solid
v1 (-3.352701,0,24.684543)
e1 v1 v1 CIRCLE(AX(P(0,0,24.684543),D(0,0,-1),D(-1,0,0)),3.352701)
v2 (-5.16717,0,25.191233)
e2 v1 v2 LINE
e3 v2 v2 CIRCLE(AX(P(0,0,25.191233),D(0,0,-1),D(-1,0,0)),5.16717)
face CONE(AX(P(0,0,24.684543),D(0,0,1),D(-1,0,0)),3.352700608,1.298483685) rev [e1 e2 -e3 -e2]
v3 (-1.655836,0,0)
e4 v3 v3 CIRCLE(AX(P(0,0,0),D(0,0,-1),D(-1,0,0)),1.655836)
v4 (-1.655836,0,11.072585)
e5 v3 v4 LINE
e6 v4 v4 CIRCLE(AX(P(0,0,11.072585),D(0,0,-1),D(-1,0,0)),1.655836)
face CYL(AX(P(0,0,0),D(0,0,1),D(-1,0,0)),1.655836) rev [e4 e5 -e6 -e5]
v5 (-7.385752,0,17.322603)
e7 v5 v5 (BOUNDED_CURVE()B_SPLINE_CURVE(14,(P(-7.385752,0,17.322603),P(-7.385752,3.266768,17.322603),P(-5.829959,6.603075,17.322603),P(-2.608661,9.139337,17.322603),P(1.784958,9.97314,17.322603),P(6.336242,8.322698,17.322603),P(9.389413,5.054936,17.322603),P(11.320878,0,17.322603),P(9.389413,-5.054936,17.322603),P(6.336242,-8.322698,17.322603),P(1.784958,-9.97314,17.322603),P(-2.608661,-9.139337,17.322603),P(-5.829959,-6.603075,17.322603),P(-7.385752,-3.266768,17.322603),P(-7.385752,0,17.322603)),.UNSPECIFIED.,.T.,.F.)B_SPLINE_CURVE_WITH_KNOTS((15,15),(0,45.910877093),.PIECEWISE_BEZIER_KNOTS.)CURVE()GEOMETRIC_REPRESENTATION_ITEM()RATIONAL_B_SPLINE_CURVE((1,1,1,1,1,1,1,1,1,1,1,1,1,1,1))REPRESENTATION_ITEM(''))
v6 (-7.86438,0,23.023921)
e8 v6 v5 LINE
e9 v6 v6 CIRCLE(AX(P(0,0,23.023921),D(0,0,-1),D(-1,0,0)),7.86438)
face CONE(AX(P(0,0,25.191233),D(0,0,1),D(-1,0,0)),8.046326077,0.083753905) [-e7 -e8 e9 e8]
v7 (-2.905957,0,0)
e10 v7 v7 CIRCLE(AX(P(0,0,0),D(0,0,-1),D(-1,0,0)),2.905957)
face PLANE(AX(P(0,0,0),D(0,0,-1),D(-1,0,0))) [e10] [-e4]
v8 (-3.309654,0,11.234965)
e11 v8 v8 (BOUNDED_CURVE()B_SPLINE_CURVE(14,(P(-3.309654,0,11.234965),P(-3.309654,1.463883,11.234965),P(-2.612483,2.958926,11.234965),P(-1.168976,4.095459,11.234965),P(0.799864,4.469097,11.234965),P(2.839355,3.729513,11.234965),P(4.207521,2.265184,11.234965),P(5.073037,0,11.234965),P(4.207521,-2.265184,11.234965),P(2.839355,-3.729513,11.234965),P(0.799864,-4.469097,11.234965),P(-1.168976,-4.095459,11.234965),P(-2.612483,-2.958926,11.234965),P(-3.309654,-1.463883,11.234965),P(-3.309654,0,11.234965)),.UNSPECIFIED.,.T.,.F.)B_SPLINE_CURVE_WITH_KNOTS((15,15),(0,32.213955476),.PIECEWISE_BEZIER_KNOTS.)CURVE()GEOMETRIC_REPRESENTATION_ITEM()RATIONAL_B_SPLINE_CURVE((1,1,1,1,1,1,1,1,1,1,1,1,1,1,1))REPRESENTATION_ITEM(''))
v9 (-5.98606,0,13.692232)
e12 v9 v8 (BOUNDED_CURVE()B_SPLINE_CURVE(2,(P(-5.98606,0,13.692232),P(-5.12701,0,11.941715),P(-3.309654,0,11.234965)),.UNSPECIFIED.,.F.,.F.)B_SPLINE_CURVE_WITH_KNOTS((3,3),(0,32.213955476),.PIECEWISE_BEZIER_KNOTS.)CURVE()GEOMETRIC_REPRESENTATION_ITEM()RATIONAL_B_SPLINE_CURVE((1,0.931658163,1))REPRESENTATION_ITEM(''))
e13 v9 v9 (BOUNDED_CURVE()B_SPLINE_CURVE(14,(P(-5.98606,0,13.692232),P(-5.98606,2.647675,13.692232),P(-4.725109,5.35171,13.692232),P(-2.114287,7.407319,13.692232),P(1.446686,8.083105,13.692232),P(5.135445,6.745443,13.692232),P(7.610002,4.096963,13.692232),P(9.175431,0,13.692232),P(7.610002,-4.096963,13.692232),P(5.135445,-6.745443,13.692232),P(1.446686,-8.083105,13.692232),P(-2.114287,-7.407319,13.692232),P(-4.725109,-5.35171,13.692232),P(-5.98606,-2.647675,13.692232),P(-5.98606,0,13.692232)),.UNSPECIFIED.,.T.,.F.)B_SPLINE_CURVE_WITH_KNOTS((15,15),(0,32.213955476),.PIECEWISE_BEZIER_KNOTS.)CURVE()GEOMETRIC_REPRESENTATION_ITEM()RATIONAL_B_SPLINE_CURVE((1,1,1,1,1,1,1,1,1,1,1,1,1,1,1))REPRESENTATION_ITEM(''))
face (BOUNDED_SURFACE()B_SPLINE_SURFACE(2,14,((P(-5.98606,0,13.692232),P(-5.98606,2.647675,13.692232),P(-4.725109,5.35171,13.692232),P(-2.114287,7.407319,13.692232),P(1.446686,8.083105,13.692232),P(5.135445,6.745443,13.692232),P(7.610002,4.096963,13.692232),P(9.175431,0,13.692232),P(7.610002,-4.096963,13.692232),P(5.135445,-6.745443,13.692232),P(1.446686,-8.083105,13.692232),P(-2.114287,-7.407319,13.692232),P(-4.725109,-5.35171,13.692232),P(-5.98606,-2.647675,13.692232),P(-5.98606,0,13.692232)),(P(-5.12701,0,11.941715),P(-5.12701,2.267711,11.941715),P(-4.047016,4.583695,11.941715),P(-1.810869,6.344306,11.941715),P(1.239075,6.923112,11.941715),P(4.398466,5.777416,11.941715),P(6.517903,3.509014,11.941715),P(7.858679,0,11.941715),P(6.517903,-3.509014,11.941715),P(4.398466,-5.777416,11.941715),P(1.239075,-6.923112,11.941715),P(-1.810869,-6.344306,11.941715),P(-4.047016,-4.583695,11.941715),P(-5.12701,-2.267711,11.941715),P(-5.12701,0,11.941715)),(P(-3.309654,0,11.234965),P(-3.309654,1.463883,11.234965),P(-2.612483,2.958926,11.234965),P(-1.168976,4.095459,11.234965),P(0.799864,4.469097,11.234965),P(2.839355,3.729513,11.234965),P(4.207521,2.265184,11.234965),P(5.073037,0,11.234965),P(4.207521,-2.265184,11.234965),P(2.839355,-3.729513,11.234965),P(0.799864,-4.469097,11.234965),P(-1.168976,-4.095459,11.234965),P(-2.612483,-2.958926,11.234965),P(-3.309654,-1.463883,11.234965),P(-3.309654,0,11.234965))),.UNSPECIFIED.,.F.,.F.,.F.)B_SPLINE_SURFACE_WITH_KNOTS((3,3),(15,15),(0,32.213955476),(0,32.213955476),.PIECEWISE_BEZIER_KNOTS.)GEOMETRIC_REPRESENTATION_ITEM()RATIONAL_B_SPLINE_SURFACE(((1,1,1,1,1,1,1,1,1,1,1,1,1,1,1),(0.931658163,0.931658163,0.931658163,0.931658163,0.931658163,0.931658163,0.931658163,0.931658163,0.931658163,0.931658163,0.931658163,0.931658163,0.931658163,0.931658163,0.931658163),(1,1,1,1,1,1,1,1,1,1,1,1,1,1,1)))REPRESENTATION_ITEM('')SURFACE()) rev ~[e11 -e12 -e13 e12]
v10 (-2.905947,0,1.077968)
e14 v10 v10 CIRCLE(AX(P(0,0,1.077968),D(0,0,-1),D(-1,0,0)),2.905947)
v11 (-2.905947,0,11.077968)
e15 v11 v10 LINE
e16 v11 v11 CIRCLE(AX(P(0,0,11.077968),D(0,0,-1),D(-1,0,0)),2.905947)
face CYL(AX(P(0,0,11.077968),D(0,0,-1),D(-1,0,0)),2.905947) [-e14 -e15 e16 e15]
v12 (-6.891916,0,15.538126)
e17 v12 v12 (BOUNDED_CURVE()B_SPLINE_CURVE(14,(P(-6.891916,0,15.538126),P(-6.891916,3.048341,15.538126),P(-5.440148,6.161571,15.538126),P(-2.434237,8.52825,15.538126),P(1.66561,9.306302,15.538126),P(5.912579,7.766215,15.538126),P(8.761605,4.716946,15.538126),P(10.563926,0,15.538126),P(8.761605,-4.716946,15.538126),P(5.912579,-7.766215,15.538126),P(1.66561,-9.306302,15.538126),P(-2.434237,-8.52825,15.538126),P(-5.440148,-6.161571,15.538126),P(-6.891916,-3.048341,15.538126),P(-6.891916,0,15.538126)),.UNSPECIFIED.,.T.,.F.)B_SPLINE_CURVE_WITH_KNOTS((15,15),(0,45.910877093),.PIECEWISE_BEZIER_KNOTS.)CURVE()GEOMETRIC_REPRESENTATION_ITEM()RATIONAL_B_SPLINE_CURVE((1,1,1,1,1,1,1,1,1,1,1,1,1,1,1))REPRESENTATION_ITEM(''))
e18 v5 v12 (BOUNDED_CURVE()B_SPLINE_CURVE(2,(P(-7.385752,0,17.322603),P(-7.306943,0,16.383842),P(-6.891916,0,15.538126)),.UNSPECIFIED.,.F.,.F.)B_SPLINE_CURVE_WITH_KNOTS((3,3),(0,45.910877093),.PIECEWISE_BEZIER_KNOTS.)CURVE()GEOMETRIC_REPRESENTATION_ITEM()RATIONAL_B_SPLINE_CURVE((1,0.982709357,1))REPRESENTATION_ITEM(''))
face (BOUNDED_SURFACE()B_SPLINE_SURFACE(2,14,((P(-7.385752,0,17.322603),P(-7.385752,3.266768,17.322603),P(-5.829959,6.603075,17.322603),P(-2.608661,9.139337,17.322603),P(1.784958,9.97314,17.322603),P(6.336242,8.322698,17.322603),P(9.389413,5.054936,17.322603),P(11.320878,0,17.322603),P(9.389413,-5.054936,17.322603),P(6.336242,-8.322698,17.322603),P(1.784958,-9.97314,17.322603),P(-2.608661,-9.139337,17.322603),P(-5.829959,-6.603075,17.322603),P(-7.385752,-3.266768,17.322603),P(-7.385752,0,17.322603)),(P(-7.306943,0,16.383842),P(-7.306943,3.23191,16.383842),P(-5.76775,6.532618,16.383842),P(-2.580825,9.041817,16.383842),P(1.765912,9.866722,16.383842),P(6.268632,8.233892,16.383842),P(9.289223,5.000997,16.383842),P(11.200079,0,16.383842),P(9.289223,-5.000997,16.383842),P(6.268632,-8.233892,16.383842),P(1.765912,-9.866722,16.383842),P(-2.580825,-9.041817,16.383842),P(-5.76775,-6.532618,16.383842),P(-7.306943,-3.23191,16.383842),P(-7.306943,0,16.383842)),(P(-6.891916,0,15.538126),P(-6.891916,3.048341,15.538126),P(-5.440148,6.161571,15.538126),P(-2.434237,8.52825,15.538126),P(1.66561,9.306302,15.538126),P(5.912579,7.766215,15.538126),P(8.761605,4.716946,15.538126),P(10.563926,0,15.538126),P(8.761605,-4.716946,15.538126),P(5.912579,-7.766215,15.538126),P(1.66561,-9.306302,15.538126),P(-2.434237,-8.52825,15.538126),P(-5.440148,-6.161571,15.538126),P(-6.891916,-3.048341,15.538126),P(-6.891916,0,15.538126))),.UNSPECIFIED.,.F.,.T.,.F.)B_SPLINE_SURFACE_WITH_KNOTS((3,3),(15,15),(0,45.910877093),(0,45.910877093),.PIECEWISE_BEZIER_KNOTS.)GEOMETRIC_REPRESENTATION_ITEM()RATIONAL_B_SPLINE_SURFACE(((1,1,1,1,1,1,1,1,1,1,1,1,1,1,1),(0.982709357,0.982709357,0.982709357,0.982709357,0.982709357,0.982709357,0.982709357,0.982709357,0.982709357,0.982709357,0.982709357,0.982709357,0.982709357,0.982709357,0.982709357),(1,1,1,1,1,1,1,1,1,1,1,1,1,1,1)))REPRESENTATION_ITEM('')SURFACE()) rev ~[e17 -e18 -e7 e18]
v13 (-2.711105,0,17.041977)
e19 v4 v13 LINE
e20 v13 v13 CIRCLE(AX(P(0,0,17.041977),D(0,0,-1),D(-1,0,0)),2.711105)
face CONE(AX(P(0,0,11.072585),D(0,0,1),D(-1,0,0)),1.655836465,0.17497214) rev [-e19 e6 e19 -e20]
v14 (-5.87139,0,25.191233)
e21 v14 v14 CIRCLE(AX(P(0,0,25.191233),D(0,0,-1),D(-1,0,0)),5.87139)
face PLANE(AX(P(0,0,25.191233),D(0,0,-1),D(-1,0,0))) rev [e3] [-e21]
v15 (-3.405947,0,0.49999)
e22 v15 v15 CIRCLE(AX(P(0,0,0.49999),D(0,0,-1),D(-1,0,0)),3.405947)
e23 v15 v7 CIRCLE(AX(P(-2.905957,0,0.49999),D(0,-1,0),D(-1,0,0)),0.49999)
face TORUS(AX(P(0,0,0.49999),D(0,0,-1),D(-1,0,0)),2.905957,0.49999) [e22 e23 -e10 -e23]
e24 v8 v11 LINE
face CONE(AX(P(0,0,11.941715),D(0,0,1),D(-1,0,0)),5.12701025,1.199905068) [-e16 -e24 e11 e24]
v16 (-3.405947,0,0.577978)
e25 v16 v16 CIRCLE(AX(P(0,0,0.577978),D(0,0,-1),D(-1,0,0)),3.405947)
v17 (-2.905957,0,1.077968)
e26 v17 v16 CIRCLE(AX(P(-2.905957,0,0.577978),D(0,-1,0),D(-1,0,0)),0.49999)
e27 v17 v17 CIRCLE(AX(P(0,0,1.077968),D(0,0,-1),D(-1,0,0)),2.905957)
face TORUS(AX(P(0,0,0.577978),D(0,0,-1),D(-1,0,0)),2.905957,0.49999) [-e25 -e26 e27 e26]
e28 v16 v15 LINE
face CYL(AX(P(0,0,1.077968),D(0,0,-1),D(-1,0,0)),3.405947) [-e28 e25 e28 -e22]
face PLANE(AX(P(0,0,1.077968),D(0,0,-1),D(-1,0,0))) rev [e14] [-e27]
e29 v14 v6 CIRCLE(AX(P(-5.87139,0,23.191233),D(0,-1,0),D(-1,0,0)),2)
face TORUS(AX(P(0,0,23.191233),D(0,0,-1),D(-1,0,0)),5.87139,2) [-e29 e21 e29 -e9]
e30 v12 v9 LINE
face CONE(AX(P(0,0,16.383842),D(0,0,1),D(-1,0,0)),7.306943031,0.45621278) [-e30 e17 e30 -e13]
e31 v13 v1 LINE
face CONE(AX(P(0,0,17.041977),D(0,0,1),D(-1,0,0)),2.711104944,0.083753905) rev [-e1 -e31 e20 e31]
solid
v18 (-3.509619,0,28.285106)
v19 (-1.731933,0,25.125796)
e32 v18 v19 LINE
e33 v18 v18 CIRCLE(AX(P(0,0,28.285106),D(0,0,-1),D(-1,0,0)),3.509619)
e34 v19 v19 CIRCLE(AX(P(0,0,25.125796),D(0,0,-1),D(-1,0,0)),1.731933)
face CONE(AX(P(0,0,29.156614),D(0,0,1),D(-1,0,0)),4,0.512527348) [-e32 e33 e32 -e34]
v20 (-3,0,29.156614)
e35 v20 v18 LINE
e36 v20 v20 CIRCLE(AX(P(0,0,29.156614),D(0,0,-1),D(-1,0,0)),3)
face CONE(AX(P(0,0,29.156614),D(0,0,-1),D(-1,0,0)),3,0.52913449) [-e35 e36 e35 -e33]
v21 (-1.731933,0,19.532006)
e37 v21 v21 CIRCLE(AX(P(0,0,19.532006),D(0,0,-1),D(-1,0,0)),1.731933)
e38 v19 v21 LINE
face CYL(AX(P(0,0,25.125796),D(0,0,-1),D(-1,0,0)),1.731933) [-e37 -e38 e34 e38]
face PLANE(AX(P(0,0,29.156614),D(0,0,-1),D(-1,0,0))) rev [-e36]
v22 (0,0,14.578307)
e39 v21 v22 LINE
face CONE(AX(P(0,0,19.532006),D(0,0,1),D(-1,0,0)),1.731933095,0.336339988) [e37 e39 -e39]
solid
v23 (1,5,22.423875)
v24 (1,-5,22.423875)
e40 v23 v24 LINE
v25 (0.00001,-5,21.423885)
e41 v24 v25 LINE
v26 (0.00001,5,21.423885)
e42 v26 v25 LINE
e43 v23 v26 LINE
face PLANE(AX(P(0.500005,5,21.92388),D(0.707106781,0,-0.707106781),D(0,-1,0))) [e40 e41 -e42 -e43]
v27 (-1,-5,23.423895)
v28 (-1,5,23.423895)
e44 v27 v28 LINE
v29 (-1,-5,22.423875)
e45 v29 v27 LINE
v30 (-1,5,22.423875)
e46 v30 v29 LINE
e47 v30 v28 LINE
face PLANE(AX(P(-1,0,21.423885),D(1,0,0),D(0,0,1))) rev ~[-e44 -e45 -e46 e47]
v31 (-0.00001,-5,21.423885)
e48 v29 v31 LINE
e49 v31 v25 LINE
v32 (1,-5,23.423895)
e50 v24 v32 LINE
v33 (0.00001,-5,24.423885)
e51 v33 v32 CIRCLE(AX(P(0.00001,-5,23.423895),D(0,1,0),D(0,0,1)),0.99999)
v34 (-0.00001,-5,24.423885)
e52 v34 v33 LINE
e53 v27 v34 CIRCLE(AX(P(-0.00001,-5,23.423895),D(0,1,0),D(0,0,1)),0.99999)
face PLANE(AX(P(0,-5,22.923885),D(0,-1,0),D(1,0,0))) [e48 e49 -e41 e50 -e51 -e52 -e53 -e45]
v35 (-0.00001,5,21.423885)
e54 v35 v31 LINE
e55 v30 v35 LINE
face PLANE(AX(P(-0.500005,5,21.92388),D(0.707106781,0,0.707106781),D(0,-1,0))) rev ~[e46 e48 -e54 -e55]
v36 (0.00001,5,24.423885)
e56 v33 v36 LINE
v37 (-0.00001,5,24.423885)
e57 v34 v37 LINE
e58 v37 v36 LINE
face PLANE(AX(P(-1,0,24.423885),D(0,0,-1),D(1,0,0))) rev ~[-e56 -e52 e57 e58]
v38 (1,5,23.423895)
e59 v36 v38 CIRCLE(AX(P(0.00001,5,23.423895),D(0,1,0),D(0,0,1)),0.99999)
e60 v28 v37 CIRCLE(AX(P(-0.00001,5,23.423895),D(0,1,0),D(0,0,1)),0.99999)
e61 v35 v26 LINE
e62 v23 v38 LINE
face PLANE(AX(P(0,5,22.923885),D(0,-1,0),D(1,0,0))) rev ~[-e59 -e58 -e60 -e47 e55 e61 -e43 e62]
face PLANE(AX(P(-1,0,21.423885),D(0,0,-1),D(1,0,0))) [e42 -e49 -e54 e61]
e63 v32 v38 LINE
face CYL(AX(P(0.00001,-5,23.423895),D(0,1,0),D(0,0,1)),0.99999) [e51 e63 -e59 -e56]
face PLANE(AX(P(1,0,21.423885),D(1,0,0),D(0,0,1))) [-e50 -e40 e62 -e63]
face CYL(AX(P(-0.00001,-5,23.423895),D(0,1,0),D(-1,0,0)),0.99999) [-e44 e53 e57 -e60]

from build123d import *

# Parameters (mm, degrees)
F2_W     = 2
F2_H     = 3
F3_DEPTH = 5
F4_SIZE  = 0.99999
F5_R     = 0.99999
F6_R     = 2
F7_SIZE  = 1
F8_R     = 5
F9_R     = 0.49999


# Not quite as in the source:
# - a fillet or chamfer is up to 0.001 mm smaller than in the source, because OpenCascade refuses the exact size


with BuildPart() as f1:
    # F0 (on Front) → F1 (revolve)
    with BuildSketch(Plane.XZ):
        Polygon((0, 14.5783070475), (0, 29.156614095), (-4, 29.156614095), (-1.7319330946, 25.1257959753), (-1.7319330946, 22.7402094752), (-1.7319330946, 19.5320062339), align=None)
    revolve(axis=Axis((0, 0, 14.5783070475), (0, 0, -1)))

    # F7
    f7_edges = [f1.edges().sort_by_distance(p)[0] for p in [
        (4, 0, 29.156614),
    ]]
    chamfer(f7_edges, length=F7_SIZE)


with BuildPart() as f1b:
    # F0 (on Front) → F1, piece 2 (revolve)
    with BuildSketch(Plane.XZ):
        Polygon((-3.3527006079, 24.6845433628), (-5.1671702769, 25.1912331348), (-8.0463260766, 25.1912331348), (-7.306943031, 16.3838422066), (-5.1270102505, 11.9417147851), (-2.9059470054, 11.0779680451), (-2.9059470054, 1.0779680451), (-3.4059470054, 1.0779680451), (-3.4059470054, 0), (-3, 0), (-1.6558364648, 0), (-1.6558364648, 11.0725850007), (-2.7111049439, 17.0419772207), align=None)
    revolve(axis=Axis((0, 0, 14.5783070475), (0, 0, -1)))

    # F6
    f6_edges = [f1b.edges().sort_by_distance(p)[0] for p in [
        (8.046326, 0, 25.191233),
    ]]
    fillet(f6_edges, radius=F6_R)

    # F8
    f8_edges = [f1b.edges().sort_by_distance(p)[0] for p in [
        (7.306943, 0, 16.383842),
        (5.12701, 0, 11.941715),
    ]]
    fillet(f8_edges, radius=F8_R)

    # F9 (radius 0.5 in the source; OpenCascade refuses exactly that, so slightly less here)
    f9_edges = [f1b.edges().sort_by_distance(p)[0] for p in [
        (3.405947, 0, 0),
        (3.405947, 0, 1.077968),
    ]]
    fillet(f9_edges, radius=F9_R)


with BuildPart() as f3:
    # F2 (on Front) → F3 (new body, symmetric)
    with BuildSketch(Plane.XZ):
        with Locations((0, 22.9238849133)):
            Rectangle(F2_W, F2_H)
    extrude(amount=F3_DEPTH, both=True)

    # F4 (size 1 in the source; OpenCascade refuses exactly that, so slightly less here)
    f4_edges = [f3.edges().sort_by_distance(p)[0] for p in [
        (-1, 0, 21.423885),
        (1, 0, 21.423885),
    ]]
    chamfer(f4_edges, length=F4_SIZE)

    # F5 (radius 1 in the source; OpenCascade refuses exactly that, so slightly less here)
    f5_edges = [f3.edges().sort_by_distance(p)[0] for p in [
        (-1, 0, 24.423885),
        (1, 0, 24.423885),
    ]]
    fillet(f5_edges, radius=F5_R)


solid = Compound([f1.part, f1b.part, f3.part])
